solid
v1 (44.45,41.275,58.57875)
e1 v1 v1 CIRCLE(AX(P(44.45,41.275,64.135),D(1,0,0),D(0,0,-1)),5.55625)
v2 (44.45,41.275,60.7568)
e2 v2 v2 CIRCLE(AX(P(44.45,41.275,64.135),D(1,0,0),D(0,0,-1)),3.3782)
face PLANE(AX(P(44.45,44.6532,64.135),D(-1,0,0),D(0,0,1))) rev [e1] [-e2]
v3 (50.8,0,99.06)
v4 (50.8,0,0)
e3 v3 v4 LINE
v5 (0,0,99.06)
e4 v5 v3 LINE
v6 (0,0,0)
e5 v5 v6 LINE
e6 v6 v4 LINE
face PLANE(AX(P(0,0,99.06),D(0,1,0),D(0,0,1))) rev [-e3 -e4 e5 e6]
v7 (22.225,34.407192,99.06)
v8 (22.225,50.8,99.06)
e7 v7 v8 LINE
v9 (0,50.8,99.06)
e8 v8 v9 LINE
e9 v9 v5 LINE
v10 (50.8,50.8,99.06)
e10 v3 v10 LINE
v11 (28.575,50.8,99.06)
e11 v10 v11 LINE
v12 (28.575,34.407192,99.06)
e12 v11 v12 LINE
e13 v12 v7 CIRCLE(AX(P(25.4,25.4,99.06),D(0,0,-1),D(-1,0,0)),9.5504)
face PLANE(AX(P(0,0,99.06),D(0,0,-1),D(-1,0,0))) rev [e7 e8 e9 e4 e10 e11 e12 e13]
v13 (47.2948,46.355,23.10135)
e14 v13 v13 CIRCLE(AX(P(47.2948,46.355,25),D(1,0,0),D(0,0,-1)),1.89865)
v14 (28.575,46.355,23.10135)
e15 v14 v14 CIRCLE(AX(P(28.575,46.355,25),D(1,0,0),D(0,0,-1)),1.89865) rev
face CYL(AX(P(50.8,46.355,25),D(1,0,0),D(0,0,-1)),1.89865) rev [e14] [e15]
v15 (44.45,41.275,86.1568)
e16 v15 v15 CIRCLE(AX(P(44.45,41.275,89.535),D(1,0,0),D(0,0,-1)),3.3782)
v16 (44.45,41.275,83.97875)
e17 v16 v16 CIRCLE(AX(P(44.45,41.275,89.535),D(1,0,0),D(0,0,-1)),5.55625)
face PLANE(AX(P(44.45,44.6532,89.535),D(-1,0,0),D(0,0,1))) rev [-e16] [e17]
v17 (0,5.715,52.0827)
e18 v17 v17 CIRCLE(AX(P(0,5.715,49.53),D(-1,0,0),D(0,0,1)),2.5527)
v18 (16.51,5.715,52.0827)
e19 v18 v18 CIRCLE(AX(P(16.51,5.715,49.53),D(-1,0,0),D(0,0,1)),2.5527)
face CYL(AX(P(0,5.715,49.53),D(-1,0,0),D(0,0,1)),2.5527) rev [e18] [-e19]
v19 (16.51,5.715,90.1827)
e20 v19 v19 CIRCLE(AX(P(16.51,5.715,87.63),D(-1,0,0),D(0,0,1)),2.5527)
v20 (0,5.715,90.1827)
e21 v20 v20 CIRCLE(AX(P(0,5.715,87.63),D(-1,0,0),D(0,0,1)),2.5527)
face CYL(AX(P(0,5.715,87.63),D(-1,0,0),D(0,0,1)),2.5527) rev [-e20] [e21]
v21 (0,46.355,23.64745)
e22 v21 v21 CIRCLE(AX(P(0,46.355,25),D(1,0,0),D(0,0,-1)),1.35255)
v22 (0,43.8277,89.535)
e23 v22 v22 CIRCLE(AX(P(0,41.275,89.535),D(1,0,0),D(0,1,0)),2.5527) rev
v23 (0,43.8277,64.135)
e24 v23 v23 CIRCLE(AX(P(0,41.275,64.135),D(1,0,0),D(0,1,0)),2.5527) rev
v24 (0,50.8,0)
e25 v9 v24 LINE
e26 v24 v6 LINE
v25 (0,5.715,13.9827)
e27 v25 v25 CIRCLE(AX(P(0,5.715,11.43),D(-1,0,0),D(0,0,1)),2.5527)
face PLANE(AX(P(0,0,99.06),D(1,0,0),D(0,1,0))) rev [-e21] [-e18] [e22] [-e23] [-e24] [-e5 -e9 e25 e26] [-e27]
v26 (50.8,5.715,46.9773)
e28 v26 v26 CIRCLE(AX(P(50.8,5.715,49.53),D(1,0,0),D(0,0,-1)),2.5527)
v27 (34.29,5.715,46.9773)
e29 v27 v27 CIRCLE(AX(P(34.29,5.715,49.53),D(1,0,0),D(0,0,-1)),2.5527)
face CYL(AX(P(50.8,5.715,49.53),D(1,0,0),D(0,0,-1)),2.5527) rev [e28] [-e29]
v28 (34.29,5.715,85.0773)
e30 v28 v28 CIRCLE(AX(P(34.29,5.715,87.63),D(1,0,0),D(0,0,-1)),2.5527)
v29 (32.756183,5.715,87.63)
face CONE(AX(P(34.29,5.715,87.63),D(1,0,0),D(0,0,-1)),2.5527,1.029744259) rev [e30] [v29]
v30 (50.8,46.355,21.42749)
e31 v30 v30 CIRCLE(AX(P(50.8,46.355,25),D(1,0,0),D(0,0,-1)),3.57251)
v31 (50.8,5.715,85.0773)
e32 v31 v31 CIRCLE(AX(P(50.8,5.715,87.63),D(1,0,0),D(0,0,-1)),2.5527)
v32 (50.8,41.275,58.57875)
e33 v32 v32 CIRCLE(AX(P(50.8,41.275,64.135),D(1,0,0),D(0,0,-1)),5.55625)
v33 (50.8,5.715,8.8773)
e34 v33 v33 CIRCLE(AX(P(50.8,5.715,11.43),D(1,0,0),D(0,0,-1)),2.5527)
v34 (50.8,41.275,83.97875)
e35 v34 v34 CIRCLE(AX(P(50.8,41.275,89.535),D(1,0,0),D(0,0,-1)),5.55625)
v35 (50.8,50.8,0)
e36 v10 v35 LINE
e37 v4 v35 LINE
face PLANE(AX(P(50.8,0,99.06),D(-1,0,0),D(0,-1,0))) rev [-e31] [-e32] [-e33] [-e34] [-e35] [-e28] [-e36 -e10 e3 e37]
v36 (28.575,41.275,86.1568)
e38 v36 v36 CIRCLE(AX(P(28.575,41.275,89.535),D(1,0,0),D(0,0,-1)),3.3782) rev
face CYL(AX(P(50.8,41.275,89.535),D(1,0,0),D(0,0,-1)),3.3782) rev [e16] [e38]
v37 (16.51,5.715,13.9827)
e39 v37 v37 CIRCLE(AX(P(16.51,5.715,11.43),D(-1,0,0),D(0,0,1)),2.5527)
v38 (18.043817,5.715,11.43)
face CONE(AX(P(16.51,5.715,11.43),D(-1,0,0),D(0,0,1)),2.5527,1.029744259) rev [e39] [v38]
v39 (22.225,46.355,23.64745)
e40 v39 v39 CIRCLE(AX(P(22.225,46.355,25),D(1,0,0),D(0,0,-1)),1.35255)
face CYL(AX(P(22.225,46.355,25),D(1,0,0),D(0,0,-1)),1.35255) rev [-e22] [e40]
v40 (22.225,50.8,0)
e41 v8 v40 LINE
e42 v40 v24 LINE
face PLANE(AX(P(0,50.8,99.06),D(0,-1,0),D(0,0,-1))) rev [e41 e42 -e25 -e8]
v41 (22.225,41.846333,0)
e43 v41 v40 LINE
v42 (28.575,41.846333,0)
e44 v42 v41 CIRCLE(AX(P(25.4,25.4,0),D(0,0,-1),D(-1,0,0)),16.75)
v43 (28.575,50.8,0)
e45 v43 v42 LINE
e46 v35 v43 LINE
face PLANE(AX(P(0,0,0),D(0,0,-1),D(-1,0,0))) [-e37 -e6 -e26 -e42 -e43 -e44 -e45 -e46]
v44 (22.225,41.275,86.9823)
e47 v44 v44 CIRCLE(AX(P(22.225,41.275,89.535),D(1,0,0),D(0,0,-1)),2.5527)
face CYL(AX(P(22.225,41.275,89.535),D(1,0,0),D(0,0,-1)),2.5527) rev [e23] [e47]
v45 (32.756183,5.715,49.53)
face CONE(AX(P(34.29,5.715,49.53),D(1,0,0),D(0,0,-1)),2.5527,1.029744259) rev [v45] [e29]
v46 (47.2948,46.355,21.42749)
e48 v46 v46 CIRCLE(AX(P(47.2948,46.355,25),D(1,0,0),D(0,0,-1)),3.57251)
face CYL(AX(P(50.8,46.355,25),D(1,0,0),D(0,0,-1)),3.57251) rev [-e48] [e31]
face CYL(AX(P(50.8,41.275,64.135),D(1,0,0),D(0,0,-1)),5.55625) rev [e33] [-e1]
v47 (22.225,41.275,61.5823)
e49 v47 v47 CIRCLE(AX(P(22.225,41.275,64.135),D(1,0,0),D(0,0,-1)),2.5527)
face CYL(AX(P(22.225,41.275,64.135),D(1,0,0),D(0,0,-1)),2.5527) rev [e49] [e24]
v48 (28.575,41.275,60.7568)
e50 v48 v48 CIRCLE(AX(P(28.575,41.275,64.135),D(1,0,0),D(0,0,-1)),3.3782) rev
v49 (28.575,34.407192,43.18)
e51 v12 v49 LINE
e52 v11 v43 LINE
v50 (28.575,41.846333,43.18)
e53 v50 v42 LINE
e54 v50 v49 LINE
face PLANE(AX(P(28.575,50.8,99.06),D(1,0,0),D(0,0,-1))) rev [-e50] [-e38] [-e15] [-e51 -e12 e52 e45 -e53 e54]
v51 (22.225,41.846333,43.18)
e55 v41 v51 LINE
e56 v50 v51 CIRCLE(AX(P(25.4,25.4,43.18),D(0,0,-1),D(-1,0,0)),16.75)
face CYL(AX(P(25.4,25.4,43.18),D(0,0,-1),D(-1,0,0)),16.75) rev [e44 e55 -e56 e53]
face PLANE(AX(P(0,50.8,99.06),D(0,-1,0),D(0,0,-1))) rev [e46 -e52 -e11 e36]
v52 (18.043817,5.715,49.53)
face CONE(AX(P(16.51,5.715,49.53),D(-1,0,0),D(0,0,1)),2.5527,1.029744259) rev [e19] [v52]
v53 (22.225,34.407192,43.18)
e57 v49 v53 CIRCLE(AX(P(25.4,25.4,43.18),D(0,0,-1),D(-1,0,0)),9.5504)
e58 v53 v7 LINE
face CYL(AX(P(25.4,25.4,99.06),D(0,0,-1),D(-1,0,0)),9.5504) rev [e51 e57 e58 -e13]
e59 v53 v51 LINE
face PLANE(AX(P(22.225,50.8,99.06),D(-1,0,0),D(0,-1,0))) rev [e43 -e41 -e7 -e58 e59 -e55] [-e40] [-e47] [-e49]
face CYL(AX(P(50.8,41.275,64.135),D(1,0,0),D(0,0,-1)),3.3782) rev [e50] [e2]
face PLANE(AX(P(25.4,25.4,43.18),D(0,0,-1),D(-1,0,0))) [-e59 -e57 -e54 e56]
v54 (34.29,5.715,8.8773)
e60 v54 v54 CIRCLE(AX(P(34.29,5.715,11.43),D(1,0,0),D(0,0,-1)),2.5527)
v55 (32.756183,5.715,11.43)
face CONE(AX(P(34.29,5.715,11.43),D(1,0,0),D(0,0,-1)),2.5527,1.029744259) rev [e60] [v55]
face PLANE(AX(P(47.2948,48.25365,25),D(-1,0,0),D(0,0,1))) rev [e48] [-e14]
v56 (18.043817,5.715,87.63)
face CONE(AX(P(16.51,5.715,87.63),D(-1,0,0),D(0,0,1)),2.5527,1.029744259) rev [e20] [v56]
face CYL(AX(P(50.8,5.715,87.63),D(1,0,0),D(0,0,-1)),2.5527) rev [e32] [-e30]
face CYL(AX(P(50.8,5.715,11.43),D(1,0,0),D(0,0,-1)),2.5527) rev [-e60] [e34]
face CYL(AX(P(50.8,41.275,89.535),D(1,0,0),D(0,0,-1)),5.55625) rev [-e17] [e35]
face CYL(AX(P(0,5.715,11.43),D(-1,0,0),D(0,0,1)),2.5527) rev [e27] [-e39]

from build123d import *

# Parameters (mm, degrees)
SKETCH1_W                                    = 50.8
SKETCH1_H                                    = 50.8
BOSS_EXTRUDE1_DEPTH                          = 99.06
SKETCH2_R                                    = 16.75
CUT_EXTRUDE1_DEPTH                           = 43.18
SKETCH3_R                                    = 9.5504
CUT_EXTRUDE2_DEPTH                           = 92.015682165
SKETCH6_W                                    = 6.35
SKETCH6_H                                    = 25.4
CUT_EXTRUDE3_DEPTH                           = 123.36896502
CBORE_START                                  = 28.575
CBORE_FOR_1_4_SOCKET_HEAD_CAP_SCREW1_OUT_R   = 3.3782
CBORE_FOR_1_4_SOCKET_HEAD_CAP_SCREW1_DEPTH   = 22.225
CBORE_START_2                                = 44.45
CBORE_FOR_1_4_SOCKET_HEAD_CAP_SCREW1_2_O_R   = 5.55625
CBORE_FOR_1_4_SOCKET_HEAD_CAP_SCREW1_2_O_R_2 = 3.3782
CBORE_FOR_1_4_SOCKET_HEAD_CAP_SCREW1_2_DEPTH = 6.35
F_1_4_20_TAPPED_HOLE1_D                      = 5.1054
CBORE_FOR_6_SOCKET_HEAD_CAP_SCREW1_OUTL_R    = 1.89865
CBORE_FOR_6_SOCKET_HEAD_CAP_SCREW1_DEPTH     = 22.225
CBORE_START_3                                = 47.2948
CBORE_FOR_6_SOCKET_HEAD_CAP_SCREW1_2_OU_R    = 3.57251
CBORE_FOR_6_SOCKET_HEAD_CAP_SCREW1_2_OU_R_2  = 1.89865
CBORE_FOR_6_SOCKET_HEAD_CAP_SCREW1_2_DEPTH   = 3.5052
F_6_32_TAPPED_HOLE1_D                        = 2.7051
F_1_4_20_TAPPED_HOLE2_D                      = 5.1054
F_1_4_20_TAPPED_HOLE2_DEPTH                  = 16.51
F_1_4_20_TAPPED_HOLE2_TIP                    = 1.533816902
F_1_4_20_TAPPED_HOLE3_D                      = 5.1054
F_1_4_20_TAPPED_HOLE3_DEPTH                  = 16.51
F_1_4_20_TAPPED_HOLE3_TIP                    = 1.533816902


# Read off the part's stored shape, not the designer's step: CBORE for 1/4 Socket Head Cap Screw1, CBORE for #6 Socket Head Cap Screw1
with BuildPart() as part:
    # Sketch1 → Boss-Extrude1 (new body)
    with BuildSketch(Plane.XY):
        with Locations((25.4, 25.4)):
            Rectangle(SKETCH1_W, SKETCH1_H)
    extrude(amount=BOSS_EXTRUDE1_DEPTH)

    # Sketch2 → Cut-Extrude1 (cut)
    with BuildSketch(Plane(origin=(0, 0, 0), x_dir=(-1, 0, 0), z_dir=(0, 0, -1))):
        with Locations((-25.4, 25.4)):
            Circle(SKETCH2_R)
    extrude(amount=-CUT_EXTRUDE1_DEPTH, mode=Mode.SUBTRACT)

    # Sketch3 → Cut-Extrude2 (cut, through all)
    with BuildSketch(Plane(origin=(0, 0, 43.18), x_dir=(-1, 0, 0), z_dir=(0, 0, -1))):
        with Locations((-25.4, 25.4)):
            Circle(SKETCH3_R)
    extrude(amount=-CUT_EXTRUDE2_DEPTH, mode=Mode.SUBTRACT)

    # Sketch6 → Cut-Extrude3 (cut, through all)
    with BuildSketch(Plane(origin=(0, 0, 0), x_dir=(-1, 0, 0), z_dir=(0, 0, -1))):
        with Locations((-25.4, 38.1)):
            Rectangle(SKETCH6_W, SKETCH6_H)
    extrude(amount=-CUT_EXTRUDE3_DEPTH, mode=Mode.SUBTRACT)

    # CBORE for 1/4 Socket Head Cap Screw1 out → CBORE for 1/4 Socket Head Cap Screw1 (cut)
    with BuildSketch(Plane.YZ.offset(CBORE_START)):
        with Locations((41.275, 64.135)):
            Circle(CBORE_FOR_1_4_SOCKET_HEAD_CAP_SCREW1_OUT_R)
        with Locations((41.275, 89.535)):
            Circle(CBORE_FOR_1_4_SOCKET_HEAD_CAP_SCREW1_OUT_R)
    extrude(amount=CBORE_FOR_1_4_SOCKET_HEAD_CAP_SCREW1_DEPTH, mode=Mode.SUBTRACT)

    # CBORE for 1_4 Socket Head Cap Screw1 2 o → CBORE for 1_4 Socket Head Cap Screw1 2 (cut)
    # profile 1 of 2: a face of its own
    with BuildSketch(Plane.YZ.offset(CBORE_START_2)):
        with Locations((41.275, 64.135)):
            Circle(CBORE_FOR_1_4_SOCKET_HEAD_CAP_SCREW1_2_O_R)
        with Locations((41.275, 64.135)):
            Circle(CBORE_FOR_1_4_SOCKET_HEAD_CAP_SCREW1_2_O_R_2, mode=Mode.SUBTRACT)
    # profile 2 of 2: a face of its own
    with BuildSketch(Plane.YZ.offset(CBORE_START_2)):
        with Locations((41.275, 89.535)):
            Circle(CBORE_FOR_1_4_SOCKET_HEAD_CAP_SCREW1_2_O_R)
        with Locations((41.275, 89.535)):
            Circle(CBORE_FOR_1_4_SOCKET_HEAD_CAP_SCREW1_2_O_R_2, mode=Mode.SUBTRACT)
    extrude(amount=CBORE_FOR_1_4_SOCKET_HEAD_CAP_SCREW1_2_DEPTH, mode=Mode.SUBTRACT)

    # 1/4-20 Tapped Hole1 (through all)
    with Locations(Plane(origin=(22.225, 0, 0), x_dir=(0, 0, -1), z_dir=(1, 0, 0))):
        with Locations((-89.535, 41.275), (-64.135, 41.275)):
            Hole(F_1_4_20_TAPPED_HOLE1_D / 2)

    # CBORE for #6 Socket Head Cap Screw1 outl → CBORE for #6 Socket Head Cap Screw1 (cut)
    with BuildSketch(Plane.YZ.offset(CBORE_START)):
        with Locations((46.355, 25)):
            Circle(CBORE_FOR_6_SOCKET_HEAD_CAP_SCREW1_OUTL_R)
    extrude(amount=CBORE_FOR_6_SOCKET_HEAD_CAP_SCREW1_DEPTH, mode=Mode.SUBTRACT)

    # CBORE for _6 Socket Head Cap Screw1 2 ou → CBORE for _6 Socket Head Cap Screw1 2 (cut)
    with BuildSketch(Plane.YZ.offset(CBORE_START_3)):
        with Locations((46.355, 25)):
            Circle(CBORE_FOR_6_SOCKET_HEAD_CAP_SCREW1_2_OU_R)
        with Locations((46.355, 25)):
            Circle(CBORE_FOR_6_SOCKET_HEAD_CAP_SCREW1_2_OU_R_2, mode=Mode.SUBTRACT)
    extrude(amount=CBORE_FOR_6_SOCKET_HEAD_CAP_SCREW1_2_DEPTH, mode=Mode.SUBTRACT)

    # #6-32 Tapped Hole1 (through all)
    with Locations(Plane(origin=(22.225, 0, 0), x_dir=(0, 0, -1), z_dir=(1, 0, 0))):
        with Locations((-25, 46.355)):
            Hole(F_6_32_TAPPED_HOLE1_D / 2)

    # 1/4-20 Tapped Hole2
    with Locations(Plane(origin=(50.8, 0, 0), x_dir=(0, 0, -1), z_dir=(1, 0, 0))):
        with Locations((-87.63, 5.715), (-49.53, 5.715), (-11.43, 5.715)):
            Hole(F_1_4_20_TAPPED_HOLE2_D / 2, depth=F_1_4_20_TAPPED_HOLE2_DEPTH)
            with Locations((0, 0, -(F_1_4_20_TAPPED_HOLE2_DEPTH + F_1_4_20_TAPPED_HOLE2_TIP / 2))):  # 118° drill point
                Cone(0, F_1_4_20_TAPPED_HOLE2_D / 2, F_1_4_20_TAPPED_HOLE2_TIP, mode=Mode.SUBTRACT)

    # 1/4-20 Tapped Hole3
    with Locations(Plane.ZY):
        with Locations((11.43, 5.715), (49.53, 5.715), (87.63, 5.715)):
            Hole(F_1_4_20_TAPPED_HOLE3_D / 2, depth=F_1_4_20_TAPPED_HOLE3_DEPTH)
            with Locations((0, 0, -(F_1_4_20_TAPPED_HOLE3_DEPTH + F_1_4_20_TAPPED_HOLE3_TIP / 2))):  # 118° drill point
                Cone(0, F_1_4_20_TAPPED_HOLE3_D / 2, F_1_4_20_TAPPED_HOLE3_TIP, mode=Mode.SUBTRACT)


solid = part.part
